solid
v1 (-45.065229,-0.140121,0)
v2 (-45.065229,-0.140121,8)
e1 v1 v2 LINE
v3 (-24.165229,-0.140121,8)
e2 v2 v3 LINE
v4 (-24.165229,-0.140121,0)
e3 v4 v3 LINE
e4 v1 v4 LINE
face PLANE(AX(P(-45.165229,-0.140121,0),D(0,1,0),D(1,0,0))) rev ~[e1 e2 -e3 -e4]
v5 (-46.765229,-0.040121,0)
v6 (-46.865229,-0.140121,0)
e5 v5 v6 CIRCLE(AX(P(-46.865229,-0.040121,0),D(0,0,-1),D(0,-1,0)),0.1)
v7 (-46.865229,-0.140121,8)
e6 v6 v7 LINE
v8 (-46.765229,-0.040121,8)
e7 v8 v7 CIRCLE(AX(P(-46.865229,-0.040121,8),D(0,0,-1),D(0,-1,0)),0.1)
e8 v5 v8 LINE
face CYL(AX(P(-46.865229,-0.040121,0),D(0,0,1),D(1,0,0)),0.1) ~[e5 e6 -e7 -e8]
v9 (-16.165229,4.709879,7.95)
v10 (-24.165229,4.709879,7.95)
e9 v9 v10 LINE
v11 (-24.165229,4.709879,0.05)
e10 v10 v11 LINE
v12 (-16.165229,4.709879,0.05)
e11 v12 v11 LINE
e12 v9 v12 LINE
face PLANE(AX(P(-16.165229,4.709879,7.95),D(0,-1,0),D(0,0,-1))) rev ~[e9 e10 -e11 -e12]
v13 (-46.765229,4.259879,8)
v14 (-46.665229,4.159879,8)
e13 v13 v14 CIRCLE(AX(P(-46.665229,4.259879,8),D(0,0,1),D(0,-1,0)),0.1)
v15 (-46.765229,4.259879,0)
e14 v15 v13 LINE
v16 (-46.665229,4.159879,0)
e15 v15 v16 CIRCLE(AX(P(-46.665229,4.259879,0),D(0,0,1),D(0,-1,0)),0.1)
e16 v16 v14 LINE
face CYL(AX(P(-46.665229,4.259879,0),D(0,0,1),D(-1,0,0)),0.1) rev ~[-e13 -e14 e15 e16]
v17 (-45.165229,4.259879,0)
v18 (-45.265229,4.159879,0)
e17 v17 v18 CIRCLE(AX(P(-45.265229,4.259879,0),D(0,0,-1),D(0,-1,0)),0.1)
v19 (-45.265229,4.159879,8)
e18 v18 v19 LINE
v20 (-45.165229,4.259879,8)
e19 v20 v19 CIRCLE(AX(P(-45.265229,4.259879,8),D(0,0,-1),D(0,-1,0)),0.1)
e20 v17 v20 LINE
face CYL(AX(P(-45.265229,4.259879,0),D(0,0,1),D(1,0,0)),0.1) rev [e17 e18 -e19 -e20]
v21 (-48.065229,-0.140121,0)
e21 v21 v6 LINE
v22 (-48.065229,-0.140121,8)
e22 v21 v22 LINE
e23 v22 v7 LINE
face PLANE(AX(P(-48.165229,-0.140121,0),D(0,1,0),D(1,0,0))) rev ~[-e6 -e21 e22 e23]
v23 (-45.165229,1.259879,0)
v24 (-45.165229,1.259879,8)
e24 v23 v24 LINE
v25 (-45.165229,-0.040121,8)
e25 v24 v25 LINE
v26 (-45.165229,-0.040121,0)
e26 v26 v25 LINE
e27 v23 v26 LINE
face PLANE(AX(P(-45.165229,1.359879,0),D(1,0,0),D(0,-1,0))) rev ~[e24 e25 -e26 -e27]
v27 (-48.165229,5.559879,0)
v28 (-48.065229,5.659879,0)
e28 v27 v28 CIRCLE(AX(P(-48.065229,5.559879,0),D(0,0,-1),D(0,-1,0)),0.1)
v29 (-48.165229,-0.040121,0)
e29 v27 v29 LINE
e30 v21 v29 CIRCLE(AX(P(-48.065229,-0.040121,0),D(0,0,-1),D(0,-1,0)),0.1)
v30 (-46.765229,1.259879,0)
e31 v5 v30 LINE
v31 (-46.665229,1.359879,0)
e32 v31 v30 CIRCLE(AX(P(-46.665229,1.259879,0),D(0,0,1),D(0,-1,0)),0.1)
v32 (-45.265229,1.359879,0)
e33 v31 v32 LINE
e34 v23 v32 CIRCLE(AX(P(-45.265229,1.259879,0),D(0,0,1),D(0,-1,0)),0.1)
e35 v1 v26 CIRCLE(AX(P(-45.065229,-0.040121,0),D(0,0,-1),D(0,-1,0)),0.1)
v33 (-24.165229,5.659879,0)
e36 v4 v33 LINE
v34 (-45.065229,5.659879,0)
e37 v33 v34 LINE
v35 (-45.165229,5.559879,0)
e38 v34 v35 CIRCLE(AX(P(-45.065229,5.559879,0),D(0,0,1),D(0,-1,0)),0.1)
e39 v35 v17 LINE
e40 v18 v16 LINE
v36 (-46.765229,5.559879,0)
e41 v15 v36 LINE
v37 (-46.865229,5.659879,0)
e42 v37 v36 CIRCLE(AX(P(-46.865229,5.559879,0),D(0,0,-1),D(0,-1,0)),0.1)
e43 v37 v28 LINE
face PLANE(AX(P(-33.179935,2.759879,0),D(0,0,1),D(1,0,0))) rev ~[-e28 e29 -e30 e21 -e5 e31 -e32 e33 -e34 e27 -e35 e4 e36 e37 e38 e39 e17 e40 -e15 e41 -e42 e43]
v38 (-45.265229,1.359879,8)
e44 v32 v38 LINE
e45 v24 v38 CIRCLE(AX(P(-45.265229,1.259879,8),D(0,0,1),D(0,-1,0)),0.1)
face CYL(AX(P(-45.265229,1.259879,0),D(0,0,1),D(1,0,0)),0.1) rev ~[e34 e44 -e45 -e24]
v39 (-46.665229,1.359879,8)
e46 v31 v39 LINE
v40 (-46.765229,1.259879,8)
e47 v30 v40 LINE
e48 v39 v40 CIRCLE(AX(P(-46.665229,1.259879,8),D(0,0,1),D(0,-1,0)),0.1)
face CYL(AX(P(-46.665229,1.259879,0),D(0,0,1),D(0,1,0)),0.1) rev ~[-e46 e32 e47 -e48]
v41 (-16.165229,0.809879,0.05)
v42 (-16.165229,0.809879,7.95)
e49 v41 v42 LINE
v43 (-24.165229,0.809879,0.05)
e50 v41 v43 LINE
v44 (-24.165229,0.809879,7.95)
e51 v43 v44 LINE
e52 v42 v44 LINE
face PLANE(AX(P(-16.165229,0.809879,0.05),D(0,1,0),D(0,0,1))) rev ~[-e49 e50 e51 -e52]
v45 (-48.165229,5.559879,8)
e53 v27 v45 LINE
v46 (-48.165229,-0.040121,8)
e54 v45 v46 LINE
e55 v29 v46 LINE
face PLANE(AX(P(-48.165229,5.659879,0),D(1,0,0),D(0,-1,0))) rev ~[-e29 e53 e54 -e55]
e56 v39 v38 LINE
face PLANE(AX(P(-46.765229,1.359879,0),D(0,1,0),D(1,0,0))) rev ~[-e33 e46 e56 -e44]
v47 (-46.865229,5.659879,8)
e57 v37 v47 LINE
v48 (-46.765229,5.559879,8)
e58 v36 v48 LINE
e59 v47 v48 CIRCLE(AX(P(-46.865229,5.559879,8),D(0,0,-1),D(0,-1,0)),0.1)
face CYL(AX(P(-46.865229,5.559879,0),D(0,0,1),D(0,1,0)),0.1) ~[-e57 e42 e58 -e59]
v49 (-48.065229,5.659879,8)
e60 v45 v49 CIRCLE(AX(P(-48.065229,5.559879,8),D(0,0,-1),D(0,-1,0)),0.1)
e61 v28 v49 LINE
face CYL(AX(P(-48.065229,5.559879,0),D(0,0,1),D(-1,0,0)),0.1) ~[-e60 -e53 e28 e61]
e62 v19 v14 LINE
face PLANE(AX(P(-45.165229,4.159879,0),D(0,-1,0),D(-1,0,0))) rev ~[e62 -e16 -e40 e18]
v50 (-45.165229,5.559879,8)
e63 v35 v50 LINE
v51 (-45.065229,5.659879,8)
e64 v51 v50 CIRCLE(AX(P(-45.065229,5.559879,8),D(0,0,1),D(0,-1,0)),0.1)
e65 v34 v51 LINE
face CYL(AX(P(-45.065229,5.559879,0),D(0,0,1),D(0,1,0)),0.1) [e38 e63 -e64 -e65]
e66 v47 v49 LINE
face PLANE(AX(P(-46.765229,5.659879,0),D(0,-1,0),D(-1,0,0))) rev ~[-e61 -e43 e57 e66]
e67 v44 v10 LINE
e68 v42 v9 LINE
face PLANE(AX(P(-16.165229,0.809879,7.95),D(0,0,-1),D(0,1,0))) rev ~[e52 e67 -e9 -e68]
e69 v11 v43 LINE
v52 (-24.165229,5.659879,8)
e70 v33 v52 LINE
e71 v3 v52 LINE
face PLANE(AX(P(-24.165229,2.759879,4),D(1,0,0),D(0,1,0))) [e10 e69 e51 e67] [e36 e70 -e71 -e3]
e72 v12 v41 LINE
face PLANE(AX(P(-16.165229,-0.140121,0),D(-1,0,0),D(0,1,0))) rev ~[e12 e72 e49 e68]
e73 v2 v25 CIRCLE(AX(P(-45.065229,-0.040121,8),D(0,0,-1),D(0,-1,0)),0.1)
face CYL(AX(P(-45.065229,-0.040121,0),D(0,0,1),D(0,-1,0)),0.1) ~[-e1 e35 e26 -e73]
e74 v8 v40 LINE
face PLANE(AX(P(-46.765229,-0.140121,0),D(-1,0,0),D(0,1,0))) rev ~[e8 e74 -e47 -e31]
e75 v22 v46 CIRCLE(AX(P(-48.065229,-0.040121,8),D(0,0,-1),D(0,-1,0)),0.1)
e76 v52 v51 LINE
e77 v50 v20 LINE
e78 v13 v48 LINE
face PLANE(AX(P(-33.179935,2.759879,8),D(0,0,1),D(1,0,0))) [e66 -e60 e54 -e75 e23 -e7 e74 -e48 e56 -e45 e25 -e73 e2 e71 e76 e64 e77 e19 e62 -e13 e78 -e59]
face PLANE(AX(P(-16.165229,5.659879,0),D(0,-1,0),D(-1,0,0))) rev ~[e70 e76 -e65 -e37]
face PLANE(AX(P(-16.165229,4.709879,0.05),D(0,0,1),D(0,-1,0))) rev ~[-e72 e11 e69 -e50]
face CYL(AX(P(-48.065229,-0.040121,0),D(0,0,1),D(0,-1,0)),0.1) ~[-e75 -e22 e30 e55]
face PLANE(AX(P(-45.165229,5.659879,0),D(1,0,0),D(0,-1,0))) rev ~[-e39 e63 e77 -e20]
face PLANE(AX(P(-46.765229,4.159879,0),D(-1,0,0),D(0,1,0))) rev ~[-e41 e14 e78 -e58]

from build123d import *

# Parameters (mm, degrees)
F1_DEPTH = 8
F2_W     = 5.8
F2_H     = 8
F3_DEPTH = 8
F4_R     = 0.1


# Not quite as in the source:
# - a feature names something its author has since deleted; it is built from what else it names


with BuildPart() as f1:
    # F0 (on Top) → F1 (new body)
    with BuildSketch(Plane.XY):
        Polygon((-16.1652290315, 5.6598789893), (-45.1652290315, 5.6598789893), (-45.1652290315, 4.1598789893), (-46.7652290315, 4.1598789893), (-46.7652290315, 5.6598789893), (-48.1652290315, 5.6598789893), (-48.1652290315, -0.1401210107), (-46.7652290315, -0.1401210107), (-46.7652290315, 1.3598789893), (-45.1652290315, 1.3598789893), (-45.1652290315, -0.1401210107), (-16.1652290315, -0.1401210107), align=None)
    extrude(amount=F1_DEPTH)

    # F2 (on face) → F3 (cut)
    with BuildSketch(Plane.YZ.offset(-16.1652290315)):
        with Locations((2.7598789893, 4)):
            Rectangle(F2_W, F2_H)
        Polygon((4.7098789893, 0.05), (2.7598789893, 0.05), (0.8098789893, 0.05), (0.8098789893, 4), (0.8098789893, 7.95), (2.7598789893, 7.95), (4.7098789893, 7.95), (4.7098789893, 4), align=None, mode=Mode.SUBTRACT)
    extrude(amount=-F3_DEPTH, mode=Mode.SUBTRACT)

    # F4
    f4_edges = [f1.edges().sort_by_distance(p)[0] for p in [
        (-46.765229, -0.140121, 4),
        (-46.765229, 1.359879, 4),
        (-46.765229, 4.159879, 4),
        (-46.765229, 5.659879, 4),
        (-48.165229, 5.659879, 4),
        (-48.165229, -0.140121, 4),
        (-45.165229, -0.140121, 4),
        (-45.165229, 5.659879, 4),
        (-45.165229, 4.159879, 4),
        (-45.165229, 1.359879, 4),
    ]]
    fillet(f4_edges, radius=F4_R)


solid = f1.part
